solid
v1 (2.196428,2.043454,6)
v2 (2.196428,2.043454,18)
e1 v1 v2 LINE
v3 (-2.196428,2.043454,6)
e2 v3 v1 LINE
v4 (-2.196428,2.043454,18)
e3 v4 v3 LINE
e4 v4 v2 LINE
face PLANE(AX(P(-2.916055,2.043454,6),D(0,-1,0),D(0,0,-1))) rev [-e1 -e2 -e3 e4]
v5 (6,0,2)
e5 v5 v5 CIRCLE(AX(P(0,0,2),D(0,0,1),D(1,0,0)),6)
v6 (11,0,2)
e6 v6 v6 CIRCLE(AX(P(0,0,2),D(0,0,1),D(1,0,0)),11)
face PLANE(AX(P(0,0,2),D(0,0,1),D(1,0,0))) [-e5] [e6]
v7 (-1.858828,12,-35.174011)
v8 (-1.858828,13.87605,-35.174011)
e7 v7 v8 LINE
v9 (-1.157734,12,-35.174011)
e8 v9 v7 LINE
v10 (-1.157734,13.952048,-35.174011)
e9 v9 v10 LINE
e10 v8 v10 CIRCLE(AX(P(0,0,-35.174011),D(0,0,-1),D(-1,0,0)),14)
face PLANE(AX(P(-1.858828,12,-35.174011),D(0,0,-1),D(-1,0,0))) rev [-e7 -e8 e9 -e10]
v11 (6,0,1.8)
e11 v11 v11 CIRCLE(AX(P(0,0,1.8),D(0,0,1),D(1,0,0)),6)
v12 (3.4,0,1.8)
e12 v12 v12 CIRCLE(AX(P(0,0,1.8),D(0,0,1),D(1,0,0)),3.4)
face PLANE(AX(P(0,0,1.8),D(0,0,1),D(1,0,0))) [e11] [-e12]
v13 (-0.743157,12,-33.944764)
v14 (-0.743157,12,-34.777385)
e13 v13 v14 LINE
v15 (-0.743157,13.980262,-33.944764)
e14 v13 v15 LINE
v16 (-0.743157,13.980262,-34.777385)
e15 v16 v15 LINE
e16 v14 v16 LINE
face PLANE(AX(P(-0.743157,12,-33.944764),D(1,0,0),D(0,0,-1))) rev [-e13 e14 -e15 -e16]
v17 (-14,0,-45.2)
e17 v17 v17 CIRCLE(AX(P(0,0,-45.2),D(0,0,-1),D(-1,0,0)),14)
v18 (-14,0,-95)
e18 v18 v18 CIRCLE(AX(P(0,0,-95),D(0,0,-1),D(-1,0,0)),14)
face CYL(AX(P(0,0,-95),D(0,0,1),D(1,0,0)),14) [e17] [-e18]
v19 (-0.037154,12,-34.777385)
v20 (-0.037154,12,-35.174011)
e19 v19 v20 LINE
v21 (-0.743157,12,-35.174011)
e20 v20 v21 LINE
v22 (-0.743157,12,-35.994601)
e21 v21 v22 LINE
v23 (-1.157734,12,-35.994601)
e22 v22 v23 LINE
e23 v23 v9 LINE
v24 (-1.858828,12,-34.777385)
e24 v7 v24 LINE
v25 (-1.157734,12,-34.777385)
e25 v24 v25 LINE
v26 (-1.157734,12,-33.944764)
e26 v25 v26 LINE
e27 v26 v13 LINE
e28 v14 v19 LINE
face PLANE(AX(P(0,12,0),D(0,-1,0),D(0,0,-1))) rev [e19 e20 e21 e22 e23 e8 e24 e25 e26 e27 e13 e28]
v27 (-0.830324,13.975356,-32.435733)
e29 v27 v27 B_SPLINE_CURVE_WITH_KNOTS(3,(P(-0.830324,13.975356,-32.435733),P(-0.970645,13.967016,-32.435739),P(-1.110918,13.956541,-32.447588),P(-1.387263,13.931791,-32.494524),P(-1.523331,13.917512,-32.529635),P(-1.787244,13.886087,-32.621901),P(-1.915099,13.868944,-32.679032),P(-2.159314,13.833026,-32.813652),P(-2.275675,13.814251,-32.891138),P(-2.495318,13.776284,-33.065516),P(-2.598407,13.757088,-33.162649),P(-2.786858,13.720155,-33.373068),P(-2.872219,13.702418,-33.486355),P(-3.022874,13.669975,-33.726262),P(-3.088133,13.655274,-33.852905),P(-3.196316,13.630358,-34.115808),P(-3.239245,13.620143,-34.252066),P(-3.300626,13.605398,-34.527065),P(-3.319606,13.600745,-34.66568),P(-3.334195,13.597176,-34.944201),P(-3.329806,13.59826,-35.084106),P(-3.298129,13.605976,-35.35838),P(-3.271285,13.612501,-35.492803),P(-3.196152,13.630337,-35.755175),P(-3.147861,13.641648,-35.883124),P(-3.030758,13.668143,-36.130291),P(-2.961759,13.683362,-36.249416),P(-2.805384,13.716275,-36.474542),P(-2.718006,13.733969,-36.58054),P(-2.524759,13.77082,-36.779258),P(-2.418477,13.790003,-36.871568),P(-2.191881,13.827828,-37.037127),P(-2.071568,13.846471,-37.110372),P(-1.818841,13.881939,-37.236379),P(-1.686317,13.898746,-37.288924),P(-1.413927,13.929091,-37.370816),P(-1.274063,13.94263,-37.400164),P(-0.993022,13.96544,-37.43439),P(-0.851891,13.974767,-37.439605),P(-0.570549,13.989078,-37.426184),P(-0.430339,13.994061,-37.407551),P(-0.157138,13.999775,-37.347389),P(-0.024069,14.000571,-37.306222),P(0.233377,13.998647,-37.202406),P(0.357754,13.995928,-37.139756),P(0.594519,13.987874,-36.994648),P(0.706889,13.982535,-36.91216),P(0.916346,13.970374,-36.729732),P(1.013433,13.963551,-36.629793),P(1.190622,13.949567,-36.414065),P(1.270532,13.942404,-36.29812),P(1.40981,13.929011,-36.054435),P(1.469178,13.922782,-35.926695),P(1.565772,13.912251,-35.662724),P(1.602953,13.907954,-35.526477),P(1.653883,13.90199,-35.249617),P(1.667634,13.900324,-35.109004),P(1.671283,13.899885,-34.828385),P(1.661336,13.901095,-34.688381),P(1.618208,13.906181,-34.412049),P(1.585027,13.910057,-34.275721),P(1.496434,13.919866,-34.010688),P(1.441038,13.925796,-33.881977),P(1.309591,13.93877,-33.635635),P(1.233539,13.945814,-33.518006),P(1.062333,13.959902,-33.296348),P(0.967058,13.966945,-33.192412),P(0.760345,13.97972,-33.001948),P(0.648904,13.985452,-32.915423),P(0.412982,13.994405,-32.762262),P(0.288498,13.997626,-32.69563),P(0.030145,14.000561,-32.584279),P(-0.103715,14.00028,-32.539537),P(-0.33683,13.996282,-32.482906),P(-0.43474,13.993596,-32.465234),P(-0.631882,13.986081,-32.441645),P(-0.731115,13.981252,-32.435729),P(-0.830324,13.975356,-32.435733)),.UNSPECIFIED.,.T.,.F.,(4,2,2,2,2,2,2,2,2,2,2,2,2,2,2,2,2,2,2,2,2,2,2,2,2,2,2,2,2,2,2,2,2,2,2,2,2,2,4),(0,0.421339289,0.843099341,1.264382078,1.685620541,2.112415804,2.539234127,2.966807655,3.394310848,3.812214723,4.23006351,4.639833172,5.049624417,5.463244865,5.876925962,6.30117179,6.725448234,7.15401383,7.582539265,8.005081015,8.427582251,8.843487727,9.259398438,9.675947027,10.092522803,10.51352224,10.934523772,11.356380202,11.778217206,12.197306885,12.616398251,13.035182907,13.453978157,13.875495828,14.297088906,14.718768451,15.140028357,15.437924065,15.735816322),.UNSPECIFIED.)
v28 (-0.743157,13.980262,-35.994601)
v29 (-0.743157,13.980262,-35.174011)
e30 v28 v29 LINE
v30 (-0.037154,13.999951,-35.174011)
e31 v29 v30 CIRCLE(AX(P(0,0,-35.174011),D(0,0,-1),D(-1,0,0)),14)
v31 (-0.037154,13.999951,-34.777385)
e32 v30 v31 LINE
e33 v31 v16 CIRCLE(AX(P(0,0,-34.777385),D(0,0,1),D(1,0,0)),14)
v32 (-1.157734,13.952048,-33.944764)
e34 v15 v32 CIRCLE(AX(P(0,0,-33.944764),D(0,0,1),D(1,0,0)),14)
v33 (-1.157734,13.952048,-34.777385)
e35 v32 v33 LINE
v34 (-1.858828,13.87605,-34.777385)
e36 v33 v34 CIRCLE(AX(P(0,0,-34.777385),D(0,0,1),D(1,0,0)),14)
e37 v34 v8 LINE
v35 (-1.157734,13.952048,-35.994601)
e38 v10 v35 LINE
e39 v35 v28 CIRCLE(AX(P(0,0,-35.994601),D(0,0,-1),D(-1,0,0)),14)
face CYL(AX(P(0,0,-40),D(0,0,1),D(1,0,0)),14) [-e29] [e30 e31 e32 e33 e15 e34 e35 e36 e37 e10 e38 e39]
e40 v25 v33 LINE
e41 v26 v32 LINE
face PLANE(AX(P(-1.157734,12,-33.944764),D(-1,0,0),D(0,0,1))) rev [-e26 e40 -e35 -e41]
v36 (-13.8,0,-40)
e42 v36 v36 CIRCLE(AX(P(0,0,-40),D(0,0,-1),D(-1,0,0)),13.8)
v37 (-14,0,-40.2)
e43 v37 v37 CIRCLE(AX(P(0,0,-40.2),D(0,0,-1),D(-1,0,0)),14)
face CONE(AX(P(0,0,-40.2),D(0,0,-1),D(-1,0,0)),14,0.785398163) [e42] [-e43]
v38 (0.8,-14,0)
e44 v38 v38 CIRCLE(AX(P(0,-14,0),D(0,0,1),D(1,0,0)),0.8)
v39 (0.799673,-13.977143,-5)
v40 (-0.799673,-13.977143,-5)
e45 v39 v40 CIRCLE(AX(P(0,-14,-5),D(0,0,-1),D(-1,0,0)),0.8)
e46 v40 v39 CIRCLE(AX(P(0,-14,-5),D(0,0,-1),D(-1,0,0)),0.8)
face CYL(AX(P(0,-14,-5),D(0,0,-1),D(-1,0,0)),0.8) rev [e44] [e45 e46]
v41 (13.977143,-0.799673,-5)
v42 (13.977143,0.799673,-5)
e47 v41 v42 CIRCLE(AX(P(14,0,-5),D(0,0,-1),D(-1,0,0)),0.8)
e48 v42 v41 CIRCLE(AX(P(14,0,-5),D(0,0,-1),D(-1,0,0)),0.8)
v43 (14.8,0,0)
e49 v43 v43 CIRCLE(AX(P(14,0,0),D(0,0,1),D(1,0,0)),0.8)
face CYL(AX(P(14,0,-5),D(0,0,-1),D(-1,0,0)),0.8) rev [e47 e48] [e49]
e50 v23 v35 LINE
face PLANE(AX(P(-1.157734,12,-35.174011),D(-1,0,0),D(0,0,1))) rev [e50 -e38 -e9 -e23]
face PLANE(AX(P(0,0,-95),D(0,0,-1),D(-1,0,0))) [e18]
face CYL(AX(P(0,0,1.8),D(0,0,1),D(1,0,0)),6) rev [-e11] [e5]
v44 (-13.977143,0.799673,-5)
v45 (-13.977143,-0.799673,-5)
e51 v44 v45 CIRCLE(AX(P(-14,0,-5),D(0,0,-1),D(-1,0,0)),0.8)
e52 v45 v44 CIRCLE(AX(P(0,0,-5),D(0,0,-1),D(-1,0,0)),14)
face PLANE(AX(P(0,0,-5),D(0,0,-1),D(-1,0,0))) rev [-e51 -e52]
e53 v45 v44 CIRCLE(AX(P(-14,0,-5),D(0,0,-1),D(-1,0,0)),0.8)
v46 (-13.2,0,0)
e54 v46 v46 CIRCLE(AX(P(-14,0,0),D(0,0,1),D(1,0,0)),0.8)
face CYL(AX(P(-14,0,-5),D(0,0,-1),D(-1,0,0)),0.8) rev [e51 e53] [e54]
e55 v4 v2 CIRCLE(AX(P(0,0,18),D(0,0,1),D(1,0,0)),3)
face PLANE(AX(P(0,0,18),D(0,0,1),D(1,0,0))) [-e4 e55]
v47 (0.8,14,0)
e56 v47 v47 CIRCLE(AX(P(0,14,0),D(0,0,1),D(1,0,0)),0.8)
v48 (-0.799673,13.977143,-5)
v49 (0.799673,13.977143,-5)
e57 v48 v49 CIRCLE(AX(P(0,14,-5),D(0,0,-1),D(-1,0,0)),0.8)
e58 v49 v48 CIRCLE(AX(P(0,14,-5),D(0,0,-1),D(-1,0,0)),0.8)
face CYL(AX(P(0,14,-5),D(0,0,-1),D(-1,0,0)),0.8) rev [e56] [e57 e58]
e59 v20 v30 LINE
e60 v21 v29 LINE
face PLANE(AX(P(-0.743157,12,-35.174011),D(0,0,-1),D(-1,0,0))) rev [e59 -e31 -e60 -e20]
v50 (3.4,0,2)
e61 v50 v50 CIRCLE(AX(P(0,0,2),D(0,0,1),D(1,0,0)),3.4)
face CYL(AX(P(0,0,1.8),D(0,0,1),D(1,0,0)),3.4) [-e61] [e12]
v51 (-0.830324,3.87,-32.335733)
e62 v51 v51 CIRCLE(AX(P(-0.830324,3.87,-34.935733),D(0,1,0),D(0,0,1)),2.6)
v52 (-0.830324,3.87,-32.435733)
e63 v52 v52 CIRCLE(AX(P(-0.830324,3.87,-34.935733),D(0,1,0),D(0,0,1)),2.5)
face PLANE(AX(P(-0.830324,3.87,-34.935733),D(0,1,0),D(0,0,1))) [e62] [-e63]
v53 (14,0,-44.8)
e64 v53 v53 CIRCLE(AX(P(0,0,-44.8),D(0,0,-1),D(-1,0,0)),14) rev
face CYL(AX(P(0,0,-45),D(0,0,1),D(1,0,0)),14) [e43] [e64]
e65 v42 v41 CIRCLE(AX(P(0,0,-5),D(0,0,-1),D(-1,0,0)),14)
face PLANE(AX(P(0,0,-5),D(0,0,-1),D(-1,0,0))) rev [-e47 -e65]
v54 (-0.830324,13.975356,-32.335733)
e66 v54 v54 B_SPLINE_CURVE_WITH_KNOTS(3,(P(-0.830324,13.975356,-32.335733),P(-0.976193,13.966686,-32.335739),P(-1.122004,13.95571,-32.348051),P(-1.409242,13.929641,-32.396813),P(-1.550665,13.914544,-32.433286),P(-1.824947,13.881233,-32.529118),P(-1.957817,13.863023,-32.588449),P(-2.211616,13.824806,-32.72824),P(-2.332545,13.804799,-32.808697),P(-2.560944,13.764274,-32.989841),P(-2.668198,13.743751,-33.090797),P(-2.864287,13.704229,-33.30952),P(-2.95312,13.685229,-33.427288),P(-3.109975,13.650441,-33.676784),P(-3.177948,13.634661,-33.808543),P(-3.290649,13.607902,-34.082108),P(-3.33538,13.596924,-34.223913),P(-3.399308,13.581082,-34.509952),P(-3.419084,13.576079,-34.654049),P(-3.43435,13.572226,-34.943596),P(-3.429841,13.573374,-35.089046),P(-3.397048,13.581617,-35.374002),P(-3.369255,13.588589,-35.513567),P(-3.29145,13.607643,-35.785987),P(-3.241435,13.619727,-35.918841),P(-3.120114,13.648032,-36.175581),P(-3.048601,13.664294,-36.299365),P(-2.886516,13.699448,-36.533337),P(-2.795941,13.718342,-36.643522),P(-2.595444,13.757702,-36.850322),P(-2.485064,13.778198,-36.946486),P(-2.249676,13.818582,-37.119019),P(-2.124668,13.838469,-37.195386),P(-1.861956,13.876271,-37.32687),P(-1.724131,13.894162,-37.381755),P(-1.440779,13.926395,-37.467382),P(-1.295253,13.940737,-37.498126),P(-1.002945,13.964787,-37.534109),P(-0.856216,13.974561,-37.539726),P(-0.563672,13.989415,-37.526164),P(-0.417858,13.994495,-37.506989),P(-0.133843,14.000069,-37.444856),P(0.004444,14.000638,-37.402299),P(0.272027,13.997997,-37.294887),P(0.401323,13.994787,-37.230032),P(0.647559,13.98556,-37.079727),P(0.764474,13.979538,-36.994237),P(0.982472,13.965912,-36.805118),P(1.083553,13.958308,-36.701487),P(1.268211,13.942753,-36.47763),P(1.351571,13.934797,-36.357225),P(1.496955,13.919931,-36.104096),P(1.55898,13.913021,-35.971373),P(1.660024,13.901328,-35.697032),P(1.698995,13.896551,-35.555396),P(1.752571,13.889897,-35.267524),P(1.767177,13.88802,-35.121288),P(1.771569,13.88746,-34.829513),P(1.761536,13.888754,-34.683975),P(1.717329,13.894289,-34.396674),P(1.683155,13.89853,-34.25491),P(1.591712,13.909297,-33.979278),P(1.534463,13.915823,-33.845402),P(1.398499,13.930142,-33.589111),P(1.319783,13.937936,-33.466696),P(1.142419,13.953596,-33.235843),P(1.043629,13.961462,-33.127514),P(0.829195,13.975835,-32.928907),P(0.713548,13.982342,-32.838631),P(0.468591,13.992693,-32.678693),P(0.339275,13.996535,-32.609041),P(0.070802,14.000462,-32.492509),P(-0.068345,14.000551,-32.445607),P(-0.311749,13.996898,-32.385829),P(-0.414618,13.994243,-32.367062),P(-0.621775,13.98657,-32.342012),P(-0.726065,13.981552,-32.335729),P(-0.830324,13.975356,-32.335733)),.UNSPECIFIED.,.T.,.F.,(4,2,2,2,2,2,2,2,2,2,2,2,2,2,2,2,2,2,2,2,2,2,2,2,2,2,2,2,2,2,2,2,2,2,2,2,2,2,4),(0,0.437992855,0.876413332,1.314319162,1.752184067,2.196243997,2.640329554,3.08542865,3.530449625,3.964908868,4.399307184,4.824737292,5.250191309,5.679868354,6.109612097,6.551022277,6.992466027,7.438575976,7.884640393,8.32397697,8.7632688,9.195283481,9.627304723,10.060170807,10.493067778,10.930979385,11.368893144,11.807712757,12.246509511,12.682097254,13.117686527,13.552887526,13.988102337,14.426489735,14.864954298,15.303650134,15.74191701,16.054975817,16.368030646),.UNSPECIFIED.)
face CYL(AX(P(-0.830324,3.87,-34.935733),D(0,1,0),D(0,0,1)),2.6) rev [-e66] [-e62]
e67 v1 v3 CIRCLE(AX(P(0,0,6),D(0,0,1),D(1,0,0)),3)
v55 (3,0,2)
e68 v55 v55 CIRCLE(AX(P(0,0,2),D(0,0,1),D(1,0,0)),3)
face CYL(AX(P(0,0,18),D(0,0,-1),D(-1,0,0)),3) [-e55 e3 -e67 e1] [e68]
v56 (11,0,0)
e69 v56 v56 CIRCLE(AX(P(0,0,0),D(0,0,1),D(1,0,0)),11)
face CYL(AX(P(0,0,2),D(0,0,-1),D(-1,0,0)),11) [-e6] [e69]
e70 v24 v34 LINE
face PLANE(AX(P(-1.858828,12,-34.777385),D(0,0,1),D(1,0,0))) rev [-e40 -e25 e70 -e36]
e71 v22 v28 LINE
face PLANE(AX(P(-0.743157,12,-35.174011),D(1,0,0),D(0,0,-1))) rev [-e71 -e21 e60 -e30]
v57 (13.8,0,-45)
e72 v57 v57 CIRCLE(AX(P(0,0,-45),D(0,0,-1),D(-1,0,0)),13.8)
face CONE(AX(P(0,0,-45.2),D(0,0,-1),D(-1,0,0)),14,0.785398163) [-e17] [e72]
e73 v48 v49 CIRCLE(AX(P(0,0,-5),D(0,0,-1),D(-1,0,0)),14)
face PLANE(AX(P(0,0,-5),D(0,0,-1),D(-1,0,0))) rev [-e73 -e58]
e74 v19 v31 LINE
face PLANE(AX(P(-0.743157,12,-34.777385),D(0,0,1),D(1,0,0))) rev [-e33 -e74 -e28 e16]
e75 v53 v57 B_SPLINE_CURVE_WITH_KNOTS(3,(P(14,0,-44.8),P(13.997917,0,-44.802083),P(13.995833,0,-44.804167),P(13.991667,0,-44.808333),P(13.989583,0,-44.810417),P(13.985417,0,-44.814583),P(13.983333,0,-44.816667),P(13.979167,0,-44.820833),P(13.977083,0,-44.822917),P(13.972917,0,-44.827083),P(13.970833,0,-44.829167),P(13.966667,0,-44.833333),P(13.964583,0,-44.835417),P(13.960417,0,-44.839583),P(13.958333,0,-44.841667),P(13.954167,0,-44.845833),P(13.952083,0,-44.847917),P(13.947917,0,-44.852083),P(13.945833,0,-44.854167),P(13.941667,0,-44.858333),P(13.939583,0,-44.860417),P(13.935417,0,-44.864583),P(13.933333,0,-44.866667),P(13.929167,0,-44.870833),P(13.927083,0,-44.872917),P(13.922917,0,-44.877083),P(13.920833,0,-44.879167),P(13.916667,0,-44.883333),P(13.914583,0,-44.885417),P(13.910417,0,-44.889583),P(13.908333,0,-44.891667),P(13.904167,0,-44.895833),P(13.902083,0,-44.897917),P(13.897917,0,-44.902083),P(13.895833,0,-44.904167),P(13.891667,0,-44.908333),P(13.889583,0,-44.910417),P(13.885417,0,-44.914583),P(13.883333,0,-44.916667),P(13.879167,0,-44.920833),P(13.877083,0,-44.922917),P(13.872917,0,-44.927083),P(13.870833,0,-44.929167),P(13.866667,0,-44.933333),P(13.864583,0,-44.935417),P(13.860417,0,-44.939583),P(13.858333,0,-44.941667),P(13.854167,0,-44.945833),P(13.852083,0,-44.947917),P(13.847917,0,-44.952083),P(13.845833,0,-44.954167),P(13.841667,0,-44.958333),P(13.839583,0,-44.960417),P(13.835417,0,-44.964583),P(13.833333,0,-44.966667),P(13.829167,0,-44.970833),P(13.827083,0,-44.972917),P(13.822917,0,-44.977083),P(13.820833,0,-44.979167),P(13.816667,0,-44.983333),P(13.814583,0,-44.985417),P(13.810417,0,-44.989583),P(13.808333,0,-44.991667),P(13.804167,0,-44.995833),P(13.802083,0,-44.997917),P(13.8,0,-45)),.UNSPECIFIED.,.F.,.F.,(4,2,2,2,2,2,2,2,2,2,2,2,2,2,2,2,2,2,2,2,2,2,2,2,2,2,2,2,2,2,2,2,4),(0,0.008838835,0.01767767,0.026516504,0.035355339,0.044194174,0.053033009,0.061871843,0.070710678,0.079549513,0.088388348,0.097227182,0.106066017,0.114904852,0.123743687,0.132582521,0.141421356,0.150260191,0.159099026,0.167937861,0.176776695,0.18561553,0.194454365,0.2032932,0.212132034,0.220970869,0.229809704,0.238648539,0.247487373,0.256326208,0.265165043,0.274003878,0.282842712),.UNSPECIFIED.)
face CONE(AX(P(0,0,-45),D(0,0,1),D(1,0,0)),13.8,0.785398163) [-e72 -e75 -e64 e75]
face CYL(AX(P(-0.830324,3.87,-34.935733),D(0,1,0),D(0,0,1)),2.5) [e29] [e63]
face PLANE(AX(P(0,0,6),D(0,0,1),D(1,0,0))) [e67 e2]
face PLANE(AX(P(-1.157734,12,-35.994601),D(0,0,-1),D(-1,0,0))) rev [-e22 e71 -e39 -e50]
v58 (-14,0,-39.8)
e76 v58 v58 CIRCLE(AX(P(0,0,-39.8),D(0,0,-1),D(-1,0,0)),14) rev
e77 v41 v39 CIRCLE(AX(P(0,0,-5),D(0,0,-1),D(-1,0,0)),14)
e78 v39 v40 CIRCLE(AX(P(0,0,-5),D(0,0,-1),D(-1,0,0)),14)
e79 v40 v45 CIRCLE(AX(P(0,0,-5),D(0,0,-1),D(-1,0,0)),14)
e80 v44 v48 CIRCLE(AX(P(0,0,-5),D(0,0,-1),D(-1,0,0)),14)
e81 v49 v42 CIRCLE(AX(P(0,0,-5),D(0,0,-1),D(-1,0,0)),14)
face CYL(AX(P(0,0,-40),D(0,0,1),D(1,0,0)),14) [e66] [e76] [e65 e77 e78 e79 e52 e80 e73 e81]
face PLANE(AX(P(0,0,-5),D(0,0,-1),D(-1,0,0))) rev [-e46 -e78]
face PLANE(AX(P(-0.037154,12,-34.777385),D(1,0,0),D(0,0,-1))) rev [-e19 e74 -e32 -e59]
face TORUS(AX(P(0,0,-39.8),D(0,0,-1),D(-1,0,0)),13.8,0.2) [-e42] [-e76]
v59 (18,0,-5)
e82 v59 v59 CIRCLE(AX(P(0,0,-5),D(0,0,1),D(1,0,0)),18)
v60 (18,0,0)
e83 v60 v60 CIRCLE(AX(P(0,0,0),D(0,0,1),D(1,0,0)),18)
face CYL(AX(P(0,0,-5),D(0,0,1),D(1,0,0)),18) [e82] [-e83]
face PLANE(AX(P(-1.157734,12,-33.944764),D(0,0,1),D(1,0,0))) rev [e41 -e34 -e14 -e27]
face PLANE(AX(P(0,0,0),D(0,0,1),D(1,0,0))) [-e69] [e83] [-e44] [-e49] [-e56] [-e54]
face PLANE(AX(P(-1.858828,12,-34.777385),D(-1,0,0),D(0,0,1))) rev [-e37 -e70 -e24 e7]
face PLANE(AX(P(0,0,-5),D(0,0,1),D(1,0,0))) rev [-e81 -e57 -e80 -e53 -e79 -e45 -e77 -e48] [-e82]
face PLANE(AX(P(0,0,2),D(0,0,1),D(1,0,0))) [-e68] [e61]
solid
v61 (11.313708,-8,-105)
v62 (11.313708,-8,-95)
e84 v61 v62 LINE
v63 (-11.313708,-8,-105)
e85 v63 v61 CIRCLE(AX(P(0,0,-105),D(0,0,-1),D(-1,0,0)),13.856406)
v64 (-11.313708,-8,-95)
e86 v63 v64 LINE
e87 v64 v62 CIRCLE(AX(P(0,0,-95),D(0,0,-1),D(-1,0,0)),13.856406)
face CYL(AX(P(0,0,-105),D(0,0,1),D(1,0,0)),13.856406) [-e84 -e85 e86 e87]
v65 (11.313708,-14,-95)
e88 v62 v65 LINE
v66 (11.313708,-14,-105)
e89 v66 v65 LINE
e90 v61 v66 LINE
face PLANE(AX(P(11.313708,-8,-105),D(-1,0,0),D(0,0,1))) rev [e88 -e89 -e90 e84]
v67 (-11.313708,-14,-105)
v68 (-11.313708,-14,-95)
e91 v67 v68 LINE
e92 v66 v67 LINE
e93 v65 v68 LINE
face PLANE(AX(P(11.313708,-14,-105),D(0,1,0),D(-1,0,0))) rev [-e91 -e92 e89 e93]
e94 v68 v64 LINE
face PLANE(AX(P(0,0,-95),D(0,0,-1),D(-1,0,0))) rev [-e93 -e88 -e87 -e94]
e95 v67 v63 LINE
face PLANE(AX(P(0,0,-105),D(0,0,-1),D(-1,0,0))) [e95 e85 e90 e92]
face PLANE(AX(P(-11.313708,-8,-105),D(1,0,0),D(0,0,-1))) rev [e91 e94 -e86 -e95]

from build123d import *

# Parameters (mm, degrees)
SKETCH1_R                   = 18
BOSS_EXTRUDE2_DEPTH         = 5
SKETCH1_4_R                 = 11
BOSS_EXTRUDE3_DEPTH         = 2
SKETCH2_R                   = 3
BOSS_EXTRUDE4_DEPTH         = 16
SKETCH3_W                   = 6.362998302
SKETCH3_H                   = 1.749824533
CUT_EXTRUDE1_DEPTH          = 12
SKETCH4_R                   = 6
SKETCH4_R_2                 = 3.4
CUT_EXTRUDE2_DEPTH          = 0.2
TAP_DRILL_FOR_M2X0_4_TAP1_D = 1.6
SKETCH5_R                   = 14
BOSS_EXTRUDE5_DEPTH         = 35
FILLET2_R                   = 0.2
SKETCH7_R                   = 14
BOSS_EXTRUDE6_DEPTH         = 5
CHAMFER1_SIZE               = 0.2
SKETCH10_R                  = 14
BOSS_EXTRUDE7_DEPTH         = 50
CHAMFER2_SIZE               = 0.2
BOSS_EXTRUDE8_DEPTH         = 10
SKETCH12_R                  = 2.6
SKETCH12_R_2                = 2.5
CUT_EXTRUDE3_DEPTH          = 10.13
CUT_EXTRUDE4_DEPTH          = 2


# Some blends are built 0.0001 mm under size
with BuildPart() as part:
    # Sketch1 → Boss-Extrude2 (new body)
    with BuildSketch(Plane.XY):
        Circle(SKETCH1_R)
    extrude(amount=-BOSS_EXTRUDE2_DEPTH)

    # Sketch1<4> → Boss-Extrude3 (add)
    with BuildSketch(Plane.XY):
        Circle(SKETCH1_4_R)
    extrude(amount=BOSS_EXTRUDE3_DEPTH)

    # Sketch2 → Boss-Extrude4 (add)
    with BuildSketch(Plane.XY.offset(2)):
        Circle(SKETCH2_R)
    extrude(amount=BOSS_EXTRUDE4_DEPTH)

    # Sketch3 → Cut-Extrude1 (cut)
    with BuildSketch(Plane.XY.offset(18)):
        with Locations((0.265444357, 2.918366652)):
            Rectangle(SKETCH3_W, SKETCH3_H)
    extrude(amount=-CUT_EXTRUDE1_DEPTH, mode=Mode.SUBTRACT)

    # Sketch4 → Cut-Extrude2 (cut)
    with BuildSketch(Plane.XY.offset(2)):
        Circle(SKETCH4_R)
        Circle(SKETCH4_R_2, mode=Mode.SUBTRACT)
    extrude(amount=-CUT_EXTRUDE2_DEPTH, mode=Mode.SUBTRACT)

    # Tap Drill for M2x0.4 Tap1 (through all)
    with Locations(Plane(origin=(0, 14, -5), x_dir=(-1, 0, 0), z_dir=(0, 0, -1))):
        with Locations((0, 0), (-14, -14), (0, -28), (14, -14)):
            Hole(TAP_DRILL_FOR_M2X0_4_TAP1_D / 2)

    # Sketch5 → Boss-Extrude5 (add)
    with BuildSketch(Plane(origin=(0, 0, -5), x_dir=(-1, 0, 0), z_dir=(0, 0, -1))):
        with Locations(Location((0, 0, 0), (0, 0, 176.725509844))):
            Circle(SKETCH5_R)
    extrude(amount=BOSS_EXTRUDE5_DEPTH)

    # Fillet2
    fillet2_edges = [part.edges().sort_by_distance(p)[0] for p in [
        (-13.977142857, -0.799673403, -40),
    ]]
    fillet(fillet2_edges, radius=FILLET2_R)

    # Sketch7 → Boss-Extrude6 (add)
    with BuildSketch(Plane(origin=(0, 0, -40), x_dir=(-1, 0, 0), z_dir=(0, 0, -1))):
        with Locations(Location((0, 0, 0), (0, 0, 176.725509844))):
            Circle(SKETCH7_R)
    extrude(amount=BOSS_EXTRUDE6_DEPTH)

    # Chamfer1
    chamfer1_edges = [part.edges().sort_by_distance(p)[0] for p in [
        (-13.977142857, -0.799673403, -40),
        (-13.977142857, -0.799673403, -45),
    ]]
    chamfer(chamfer1_edges, length=CHAMFER1_SIZE - 0.0001)  # a hair under: the kernel refuses the full size

    # Sketch10 → Boss-Extrude7 (add)
    with BuildSketch(Plane(origin=(0, 0, -45), x_dir=(-1, 0, 0), z_dir=(0, 0, -1))):
        with Locations(Location((0, 0, 0), (0, 0, 176.725509844))):
            Circle(SKETCH10_R)
    extrude(amount=BOSS_EXTRUDE7_DEPTH)

    # Chamfer2
    # the kernel refuses this chamfer: 0.2 mm, written as the material it takes off along each edge
    with BuildSketch(Plane(origin=(0, 0, -45), x_dir=(0.9983673469383324, 0.057119528773576726, 0), z_dir=(-0.057119528773576726, 0.9983673469383324, 0))) as chamfer2_piece_1:
        Polygon((14, CHAMFER2_SIZE), (14 - CHAMFER2_SIZE, 0), (14, 0), align=None)
    revolve(axis=Axis((0, 0, -45), (0, 0, -1)), mode=Mode.SUBTRACT)

    # Sketch12 → Cut-Extrude3 (cut)
    with BuildSketch(Plane(origin=(0, 14, 0), x_dir=(1, 0, 0), z_dir=(0, 1, 0))):
        with Locations(Location((-0.830324238, 34.935733276, 0), (0, 0, 270))):
            Circle(SKETCH12_R)
        with Locations(Location((-0.830324238, 34.935733276, 0), (0, 0, 270))):
            Circle(SKETCH12_R_2, mode=Mode.SUBTRACT)
    extrude(amount=-CUT_EXTRUDE3_DEPTH, mode=Mode.SUBTRACT)

    # Sketch13 → Cut-Extrude4 (cut)
    with BuildSketch(Plane(origin=(0, 14, 0), x_dir=(1, 0, 0), z_dir=(0, 1, 0))):
        Polygon((-0.743156629, 35.174011268), (-0.037154138, 35.174011268), (-0.037154138, 34.777385043), (-0.743156629, 34.777385043), (-0.743156629, 33.944764058), (-1.157734464, 33.944764058), (-1.157734464, 34.777385043), (-1.858828415, 34.777385043), (-1.858828415, 35.174011268), (-1.157734464, 35.174011268), (-1.157734464, 35.994600549), (-0.743156629, 35.994600549), align=None)
    extrude(amount=-CUT_EXTRUDE4_DEPTH, mode=Mode.SUBTRACT)


with BuildPart() as body_2:
    # Sketch11 → Boss-Extrude8 (new body)
    with BuildSketch(Plane(origin=(0, 0, -95), x_dir=(-1, 0, 0), z_dir=(0, 0, -1))):
        with BuildLine():
            Line((-11.313708499, -8), (-11.313708499, -14))
            Line((-11.313708499, -14), (11.313708499, -14))
            Line((11.313708499, -14), (11.313708499, -8))
            ThreePointArc((11.313708499, -8), (0, 13.856406461), (-11.313708499, -8))
        make_face()
    extrude(amount=BOSS_EXTRUDE8_DEPTH)


solid = Compound([part.part, body_2.part])
